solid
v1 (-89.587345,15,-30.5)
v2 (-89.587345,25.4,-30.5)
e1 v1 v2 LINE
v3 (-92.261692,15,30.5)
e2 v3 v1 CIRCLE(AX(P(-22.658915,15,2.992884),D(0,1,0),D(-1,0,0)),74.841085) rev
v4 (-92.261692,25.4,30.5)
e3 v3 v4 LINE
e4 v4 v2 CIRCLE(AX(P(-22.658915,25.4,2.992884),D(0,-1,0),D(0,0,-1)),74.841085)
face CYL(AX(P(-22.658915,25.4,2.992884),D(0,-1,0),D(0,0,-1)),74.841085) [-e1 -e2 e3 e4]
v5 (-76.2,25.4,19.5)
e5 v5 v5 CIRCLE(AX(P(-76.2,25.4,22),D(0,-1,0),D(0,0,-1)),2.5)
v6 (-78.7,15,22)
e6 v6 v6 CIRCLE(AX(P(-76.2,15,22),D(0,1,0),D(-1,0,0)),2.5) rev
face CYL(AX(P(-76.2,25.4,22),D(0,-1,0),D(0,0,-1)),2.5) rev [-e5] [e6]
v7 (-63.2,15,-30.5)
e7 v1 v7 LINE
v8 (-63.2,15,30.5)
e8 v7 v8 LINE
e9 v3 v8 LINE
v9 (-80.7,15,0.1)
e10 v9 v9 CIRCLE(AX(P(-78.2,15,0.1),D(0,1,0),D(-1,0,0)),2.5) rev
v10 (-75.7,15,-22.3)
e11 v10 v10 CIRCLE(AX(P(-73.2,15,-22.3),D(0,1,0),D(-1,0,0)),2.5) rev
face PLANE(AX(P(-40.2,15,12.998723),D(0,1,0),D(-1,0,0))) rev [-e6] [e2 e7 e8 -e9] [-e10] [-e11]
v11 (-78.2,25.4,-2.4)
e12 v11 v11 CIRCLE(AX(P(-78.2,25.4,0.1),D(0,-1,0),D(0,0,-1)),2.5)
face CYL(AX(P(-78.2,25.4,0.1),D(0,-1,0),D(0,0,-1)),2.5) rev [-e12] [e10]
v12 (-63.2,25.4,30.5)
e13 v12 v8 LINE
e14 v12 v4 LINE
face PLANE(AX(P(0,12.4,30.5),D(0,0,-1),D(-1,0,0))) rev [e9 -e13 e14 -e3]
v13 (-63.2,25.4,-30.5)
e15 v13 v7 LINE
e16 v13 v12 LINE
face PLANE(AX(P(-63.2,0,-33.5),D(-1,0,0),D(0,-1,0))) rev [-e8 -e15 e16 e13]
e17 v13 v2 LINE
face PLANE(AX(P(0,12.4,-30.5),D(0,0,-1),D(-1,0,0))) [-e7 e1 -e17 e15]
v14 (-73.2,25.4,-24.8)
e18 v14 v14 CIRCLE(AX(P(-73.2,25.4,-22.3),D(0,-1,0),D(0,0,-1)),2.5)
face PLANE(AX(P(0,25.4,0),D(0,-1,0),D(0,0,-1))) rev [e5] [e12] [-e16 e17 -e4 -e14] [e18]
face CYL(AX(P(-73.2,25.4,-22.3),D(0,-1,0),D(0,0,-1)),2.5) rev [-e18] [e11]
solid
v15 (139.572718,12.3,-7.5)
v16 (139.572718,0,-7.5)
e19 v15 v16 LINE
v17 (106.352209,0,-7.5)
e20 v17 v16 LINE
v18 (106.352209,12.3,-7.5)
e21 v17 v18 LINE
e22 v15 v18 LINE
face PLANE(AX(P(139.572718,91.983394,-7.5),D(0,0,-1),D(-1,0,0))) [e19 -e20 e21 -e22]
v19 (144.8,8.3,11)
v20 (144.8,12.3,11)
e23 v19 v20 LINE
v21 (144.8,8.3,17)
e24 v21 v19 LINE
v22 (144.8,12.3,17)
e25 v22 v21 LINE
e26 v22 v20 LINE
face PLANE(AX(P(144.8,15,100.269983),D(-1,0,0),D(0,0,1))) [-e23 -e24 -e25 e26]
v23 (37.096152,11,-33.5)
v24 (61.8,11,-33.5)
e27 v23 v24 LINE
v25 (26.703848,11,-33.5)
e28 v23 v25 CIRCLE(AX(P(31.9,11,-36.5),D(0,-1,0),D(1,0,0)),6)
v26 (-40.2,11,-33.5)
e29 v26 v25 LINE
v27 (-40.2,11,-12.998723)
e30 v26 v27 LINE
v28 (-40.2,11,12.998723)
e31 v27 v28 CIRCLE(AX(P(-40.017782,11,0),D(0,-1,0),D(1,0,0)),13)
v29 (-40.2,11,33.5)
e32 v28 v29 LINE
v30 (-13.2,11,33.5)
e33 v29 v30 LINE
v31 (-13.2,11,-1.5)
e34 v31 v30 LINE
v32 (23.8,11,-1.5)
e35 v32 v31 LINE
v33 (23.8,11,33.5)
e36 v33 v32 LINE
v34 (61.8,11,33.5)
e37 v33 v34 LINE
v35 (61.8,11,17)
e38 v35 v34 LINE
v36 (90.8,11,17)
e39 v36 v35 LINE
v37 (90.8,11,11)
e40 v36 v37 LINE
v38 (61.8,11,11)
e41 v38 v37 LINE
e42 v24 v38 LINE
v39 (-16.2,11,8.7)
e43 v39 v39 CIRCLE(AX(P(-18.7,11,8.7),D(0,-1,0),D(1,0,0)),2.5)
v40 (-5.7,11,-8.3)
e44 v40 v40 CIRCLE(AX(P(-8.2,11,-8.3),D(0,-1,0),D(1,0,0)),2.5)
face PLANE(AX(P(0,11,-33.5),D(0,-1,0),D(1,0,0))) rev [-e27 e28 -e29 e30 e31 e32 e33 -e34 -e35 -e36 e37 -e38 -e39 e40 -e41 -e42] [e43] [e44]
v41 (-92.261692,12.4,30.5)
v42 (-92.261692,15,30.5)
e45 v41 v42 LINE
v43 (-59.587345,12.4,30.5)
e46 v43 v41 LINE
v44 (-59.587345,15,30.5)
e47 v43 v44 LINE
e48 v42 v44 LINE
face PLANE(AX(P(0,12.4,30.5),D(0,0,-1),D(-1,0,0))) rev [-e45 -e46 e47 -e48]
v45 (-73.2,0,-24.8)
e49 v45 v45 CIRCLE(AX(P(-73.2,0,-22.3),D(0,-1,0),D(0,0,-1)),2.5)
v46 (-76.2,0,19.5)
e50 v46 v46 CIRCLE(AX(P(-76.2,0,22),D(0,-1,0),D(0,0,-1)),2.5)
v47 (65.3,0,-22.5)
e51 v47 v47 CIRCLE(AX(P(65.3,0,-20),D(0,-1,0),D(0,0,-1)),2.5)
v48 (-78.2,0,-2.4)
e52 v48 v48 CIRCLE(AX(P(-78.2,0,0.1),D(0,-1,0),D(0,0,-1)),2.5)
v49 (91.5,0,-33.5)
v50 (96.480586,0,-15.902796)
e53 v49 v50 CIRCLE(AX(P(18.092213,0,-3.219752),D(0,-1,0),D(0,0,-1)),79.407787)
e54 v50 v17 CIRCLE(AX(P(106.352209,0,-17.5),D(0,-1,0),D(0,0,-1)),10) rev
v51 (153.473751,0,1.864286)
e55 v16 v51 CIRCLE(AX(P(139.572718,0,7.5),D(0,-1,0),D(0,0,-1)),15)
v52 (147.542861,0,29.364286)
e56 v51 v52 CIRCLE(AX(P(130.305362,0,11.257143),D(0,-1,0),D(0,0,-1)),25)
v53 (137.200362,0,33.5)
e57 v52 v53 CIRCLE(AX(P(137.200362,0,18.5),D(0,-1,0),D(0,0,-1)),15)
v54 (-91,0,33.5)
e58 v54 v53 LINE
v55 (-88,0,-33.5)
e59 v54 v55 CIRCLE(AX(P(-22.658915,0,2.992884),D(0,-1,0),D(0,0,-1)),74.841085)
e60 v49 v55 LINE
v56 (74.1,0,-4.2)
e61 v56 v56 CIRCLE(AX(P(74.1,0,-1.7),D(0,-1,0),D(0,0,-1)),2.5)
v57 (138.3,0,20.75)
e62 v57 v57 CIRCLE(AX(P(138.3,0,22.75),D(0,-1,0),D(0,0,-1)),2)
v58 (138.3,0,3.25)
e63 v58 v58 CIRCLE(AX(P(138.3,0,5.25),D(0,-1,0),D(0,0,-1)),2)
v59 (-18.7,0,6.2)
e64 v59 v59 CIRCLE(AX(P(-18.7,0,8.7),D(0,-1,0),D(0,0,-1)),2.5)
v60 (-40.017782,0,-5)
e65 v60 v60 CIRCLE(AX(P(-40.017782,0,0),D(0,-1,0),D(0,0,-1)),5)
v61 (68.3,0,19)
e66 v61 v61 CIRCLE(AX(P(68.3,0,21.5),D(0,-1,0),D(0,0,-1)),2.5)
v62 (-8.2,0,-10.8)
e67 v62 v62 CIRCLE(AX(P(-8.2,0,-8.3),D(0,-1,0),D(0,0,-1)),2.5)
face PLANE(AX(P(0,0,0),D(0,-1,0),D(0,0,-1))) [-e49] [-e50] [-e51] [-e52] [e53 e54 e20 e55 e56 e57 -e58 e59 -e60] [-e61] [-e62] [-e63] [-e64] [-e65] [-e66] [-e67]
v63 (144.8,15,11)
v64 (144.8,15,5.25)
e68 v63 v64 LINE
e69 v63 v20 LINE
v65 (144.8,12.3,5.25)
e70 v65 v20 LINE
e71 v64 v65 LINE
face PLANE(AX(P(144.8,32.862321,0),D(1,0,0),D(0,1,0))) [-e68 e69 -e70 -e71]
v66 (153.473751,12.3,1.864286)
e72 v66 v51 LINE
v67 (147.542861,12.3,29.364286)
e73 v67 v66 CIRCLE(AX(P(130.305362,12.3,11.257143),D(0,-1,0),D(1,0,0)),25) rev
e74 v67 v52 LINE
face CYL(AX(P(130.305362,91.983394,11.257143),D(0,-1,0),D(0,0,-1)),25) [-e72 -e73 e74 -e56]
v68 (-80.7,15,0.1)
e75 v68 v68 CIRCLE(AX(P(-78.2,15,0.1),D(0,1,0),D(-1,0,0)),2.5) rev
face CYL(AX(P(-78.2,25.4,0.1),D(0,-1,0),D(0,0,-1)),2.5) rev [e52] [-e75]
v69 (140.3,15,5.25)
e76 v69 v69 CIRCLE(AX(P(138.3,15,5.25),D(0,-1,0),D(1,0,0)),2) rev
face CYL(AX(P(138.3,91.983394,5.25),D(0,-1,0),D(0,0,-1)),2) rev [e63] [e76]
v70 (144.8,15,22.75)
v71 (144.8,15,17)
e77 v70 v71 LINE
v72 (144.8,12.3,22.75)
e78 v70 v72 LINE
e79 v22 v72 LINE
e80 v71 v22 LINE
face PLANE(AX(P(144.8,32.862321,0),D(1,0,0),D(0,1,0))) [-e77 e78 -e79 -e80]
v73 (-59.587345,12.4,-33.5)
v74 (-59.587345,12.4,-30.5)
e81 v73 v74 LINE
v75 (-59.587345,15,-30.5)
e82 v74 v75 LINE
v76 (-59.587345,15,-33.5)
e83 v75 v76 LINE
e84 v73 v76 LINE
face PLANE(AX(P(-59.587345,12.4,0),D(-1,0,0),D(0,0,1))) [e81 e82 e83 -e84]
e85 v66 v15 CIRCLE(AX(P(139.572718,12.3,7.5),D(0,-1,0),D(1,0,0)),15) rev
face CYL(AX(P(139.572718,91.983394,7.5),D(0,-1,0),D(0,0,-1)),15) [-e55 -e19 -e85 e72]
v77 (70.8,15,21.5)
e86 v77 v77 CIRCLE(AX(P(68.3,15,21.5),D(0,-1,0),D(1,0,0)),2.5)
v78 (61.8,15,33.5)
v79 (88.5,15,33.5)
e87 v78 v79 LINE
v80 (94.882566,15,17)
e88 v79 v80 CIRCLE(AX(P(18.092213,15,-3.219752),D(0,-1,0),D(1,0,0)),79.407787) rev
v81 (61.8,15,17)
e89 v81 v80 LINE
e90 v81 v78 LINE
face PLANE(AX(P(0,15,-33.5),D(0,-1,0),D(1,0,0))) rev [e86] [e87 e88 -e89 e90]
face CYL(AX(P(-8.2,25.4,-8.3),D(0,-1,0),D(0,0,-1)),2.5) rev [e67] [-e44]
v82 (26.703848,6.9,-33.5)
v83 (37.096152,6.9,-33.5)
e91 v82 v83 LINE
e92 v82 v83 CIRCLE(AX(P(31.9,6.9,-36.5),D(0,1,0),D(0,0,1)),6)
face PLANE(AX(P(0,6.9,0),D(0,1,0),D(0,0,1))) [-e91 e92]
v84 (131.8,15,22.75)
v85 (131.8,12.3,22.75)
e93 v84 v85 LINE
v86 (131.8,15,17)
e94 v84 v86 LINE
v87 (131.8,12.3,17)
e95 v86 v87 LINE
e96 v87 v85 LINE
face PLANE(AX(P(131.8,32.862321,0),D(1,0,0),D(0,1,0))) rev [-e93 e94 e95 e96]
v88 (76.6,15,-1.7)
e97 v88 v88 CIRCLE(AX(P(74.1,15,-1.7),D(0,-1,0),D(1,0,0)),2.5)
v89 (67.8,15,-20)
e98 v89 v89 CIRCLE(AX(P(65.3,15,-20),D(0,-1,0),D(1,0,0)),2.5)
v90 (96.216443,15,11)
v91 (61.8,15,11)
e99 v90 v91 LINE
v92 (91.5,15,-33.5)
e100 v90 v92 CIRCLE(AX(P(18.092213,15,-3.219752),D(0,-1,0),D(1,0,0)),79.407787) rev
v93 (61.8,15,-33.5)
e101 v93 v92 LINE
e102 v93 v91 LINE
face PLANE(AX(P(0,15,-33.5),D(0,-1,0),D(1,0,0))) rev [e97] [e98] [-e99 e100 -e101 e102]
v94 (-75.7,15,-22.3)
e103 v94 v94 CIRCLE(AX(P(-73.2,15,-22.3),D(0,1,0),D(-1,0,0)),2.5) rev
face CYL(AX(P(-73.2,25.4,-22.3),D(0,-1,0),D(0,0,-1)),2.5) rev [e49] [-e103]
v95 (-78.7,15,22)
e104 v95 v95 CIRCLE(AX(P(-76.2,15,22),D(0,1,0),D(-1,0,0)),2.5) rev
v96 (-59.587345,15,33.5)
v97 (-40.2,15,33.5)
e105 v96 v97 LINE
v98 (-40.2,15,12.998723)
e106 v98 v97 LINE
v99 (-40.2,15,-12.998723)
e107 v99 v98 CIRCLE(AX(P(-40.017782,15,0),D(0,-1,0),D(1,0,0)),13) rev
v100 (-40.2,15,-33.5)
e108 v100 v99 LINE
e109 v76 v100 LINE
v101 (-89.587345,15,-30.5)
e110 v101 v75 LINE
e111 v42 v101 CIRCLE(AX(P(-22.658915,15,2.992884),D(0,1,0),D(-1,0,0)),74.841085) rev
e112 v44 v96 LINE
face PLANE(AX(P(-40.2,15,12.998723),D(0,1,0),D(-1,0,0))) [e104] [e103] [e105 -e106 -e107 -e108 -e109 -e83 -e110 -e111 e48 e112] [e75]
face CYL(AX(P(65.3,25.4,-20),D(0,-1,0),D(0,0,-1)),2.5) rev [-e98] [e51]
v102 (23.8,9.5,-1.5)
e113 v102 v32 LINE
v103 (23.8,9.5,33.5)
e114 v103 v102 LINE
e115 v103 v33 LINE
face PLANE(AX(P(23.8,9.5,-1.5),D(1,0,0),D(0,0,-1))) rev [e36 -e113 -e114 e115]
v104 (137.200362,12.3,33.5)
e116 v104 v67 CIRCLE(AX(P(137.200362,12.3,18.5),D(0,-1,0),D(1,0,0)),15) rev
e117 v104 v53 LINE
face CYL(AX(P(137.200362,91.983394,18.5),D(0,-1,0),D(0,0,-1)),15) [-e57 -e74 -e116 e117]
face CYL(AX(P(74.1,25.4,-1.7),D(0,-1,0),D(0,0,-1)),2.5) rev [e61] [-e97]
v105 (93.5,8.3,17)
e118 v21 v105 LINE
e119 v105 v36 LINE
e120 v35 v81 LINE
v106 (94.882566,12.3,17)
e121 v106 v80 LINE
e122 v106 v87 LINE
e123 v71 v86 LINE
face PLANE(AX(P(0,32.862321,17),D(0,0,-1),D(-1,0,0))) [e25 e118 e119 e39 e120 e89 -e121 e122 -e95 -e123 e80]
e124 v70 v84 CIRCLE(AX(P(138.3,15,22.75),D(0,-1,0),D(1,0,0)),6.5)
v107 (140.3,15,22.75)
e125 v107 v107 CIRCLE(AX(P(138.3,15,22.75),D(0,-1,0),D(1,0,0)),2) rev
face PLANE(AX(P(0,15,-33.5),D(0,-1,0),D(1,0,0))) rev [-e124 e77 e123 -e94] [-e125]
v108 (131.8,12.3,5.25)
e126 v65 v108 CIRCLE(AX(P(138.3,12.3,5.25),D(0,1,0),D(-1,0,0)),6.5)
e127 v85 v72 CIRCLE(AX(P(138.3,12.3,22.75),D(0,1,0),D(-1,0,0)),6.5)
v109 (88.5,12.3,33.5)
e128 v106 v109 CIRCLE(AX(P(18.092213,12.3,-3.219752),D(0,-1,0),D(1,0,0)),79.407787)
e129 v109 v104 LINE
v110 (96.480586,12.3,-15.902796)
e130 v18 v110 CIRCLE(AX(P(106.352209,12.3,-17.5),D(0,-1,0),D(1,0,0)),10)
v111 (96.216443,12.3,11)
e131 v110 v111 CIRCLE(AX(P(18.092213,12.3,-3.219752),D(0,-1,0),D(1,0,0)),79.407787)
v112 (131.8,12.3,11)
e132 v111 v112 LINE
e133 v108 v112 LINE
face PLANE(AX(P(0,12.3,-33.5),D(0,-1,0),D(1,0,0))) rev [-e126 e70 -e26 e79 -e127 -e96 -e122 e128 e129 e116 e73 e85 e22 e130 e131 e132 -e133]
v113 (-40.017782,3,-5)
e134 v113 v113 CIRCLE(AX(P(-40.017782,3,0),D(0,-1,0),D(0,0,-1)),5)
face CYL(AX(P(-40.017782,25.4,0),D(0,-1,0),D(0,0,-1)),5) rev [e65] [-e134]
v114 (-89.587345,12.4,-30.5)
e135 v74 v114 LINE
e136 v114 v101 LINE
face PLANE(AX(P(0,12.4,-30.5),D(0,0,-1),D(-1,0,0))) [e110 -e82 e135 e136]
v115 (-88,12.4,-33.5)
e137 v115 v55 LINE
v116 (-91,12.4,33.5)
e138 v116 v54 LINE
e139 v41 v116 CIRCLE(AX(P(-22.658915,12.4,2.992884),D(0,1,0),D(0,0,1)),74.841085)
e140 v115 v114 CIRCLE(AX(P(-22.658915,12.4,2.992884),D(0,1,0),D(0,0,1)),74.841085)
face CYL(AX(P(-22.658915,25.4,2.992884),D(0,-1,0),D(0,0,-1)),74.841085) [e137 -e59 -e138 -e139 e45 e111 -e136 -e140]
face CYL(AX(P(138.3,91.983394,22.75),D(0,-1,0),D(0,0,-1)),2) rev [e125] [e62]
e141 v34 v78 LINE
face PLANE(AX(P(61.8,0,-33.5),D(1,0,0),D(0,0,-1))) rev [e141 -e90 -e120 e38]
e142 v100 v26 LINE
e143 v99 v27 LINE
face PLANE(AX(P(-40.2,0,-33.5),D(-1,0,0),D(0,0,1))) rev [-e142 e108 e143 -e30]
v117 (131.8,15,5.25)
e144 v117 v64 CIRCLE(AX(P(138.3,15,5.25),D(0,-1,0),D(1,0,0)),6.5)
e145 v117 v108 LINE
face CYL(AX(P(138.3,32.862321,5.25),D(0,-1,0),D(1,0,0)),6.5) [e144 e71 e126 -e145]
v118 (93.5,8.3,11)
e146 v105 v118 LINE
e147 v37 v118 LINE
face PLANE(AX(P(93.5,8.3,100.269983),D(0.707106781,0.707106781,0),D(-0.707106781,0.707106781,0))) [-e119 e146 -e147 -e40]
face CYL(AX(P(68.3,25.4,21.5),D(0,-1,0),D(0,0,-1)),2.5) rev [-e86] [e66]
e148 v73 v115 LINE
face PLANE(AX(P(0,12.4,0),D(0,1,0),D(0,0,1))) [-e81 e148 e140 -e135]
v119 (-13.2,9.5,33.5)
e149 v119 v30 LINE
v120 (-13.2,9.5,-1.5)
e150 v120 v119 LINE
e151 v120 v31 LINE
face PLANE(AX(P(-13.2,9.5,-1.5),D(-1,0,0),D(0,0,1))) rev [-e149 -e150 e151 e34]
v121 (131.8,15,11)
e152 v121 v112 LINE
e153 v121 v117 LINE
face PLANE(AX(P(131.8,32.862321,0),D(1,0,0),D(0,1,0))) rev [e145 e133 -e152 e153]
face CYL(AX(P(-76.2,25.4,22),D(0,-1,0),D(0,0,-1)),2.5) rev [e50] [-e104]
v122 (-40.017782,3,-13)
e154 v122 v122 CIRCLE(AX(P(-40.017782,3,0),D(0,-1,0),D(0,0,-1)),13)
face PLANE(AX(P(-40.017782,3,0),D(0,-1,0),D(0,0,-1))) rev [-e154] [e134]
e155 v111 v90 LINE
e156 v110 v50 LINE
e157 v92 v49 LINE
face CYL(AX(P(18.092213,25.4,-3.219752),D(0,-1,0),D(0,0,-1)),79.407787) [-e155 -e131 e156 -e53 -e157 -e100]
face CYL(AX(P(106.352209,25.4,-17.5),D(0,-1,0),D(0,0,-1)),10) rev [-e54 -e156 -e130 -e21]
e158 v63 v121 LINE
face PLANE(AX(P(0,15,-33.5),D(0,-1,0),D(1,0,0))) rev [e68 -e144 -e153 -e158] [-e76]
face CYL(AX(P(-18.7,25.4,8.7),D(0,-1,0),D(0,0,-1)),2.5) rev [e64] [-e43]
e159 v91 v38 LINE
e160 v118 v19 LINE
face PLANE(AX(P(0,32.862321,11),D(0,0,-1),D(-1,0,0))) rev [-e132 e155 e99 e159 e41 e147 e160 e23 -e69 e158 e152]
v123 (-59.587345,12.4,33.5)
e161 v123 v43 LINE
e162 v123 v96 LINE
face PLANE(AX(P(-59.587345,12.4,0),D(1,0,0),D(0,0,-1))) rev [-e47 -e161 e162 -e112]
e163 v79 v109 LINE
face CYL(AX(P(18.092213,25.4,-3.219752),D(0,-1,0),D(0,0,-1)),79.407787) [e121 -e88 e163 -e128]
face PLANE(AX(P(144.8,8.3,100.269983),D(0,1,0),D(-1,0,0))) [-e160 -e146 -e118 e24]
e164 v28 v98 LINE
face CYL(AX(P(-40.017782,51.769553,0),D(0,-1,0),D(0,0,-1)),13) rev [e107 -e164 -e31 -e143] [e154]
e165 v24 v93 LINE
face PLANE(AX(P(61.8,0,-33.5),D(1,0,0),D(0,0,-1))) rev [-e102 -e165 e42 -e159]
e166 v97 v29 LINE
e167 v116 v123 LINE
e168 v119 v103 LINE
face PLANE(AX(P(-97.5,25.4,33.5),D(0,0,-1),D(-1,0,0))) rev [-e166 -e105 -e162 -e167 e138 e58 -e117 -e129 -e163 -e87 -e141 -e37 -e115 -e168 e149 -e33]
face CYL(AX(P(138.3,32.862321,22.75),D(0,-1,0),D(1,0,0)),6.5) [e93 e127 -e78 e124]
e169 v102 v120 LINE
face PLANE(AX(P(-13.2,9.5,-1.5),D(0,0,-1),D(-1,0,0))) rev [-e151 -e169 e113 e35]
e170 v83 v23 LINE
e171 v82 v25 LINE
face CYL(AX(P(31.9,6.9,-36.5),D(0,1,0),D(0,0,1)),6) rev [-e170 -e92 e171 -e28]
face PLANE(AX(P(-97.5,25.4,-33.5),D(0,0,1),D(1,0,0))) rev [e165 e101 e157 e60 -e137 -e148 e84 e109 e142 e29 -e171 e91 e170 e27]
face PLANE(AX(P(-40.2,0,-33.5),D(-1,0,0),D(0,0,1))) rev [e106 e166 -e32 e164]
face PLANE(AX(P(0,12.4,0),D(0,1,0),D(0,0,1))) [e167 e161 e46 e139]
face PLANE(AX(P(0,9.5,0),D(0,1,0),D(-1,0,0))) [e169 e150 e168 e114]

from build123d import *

# Parameters (mm, degrees)
SKETCH1_W           = 195
SKETCH1_H           = 67
BOSS_EXTRUDE1_DEPTH = 25.4
CUT_EXTRUDE1_DEPTH  = 107.177492907
CUT_EXTRUDE2_DEPTH  = 121.997561959
CUT_EXTRUDE3_START  = -13
SKETCH4_W           = 3.612655346
SKETCH4_H           = 3
CUT_EXTRUDE3_DEPTH  = 13
SKETCH6_R           = 2.5
CUT_EXTRUDE4_DEPTH  = 107.177492907
SKETCH7_W           = 37
SKETCH7_H           = 35
CUT_EXTRUDE5_DEPTH  = 1.5
CUT_EXTRUDE6_DEPTH  = 18.5
SKETCH9_R           = 2
BOSS_EXTRUDE2_DEPTH = 12.3
FILLET1_R           = 10
CUT_EXTRUDE7_REACH  = 165.895
CUT_EXTRUDE7_START  = -3
SKETCH10_R          = 13
SKETCH13_R          = 5
CUT_EXTRUDE9_DEPTH  = 161.89488962
SKETCH11_R          = 2
BOSS_EXTRUDE3_DEPTH = 2.7
CUT_EXTRUDE8_DEPTH  = 6


# Read off the part's stored shape, not the designer's step: Split1
with BuildPart() as part:
    # Sketch1 → Boss-Extrude1 (new body)
    with BuildSketch(Plane(origin=(0, 0, 0), x_dir=(1, 0, 0), z_dir=(0, 1, 0))):
        Rectangle(SKETCH1_W, SKETCH1_H)
    extrude(amount=BOSS_EXTRUDE1_DEPTH)

    # Sketch2 → Cut-Extrude1 (cut, through all)
    with BuildSketch(Plane.XZ):
        with BuildLine():
            Line((97.5, -3.219751644), (97.5, 33.5))
            Line((97.5, 33.5), (88.5, 33.5))
            ThreePointArc((88.5, 33.5), (95.217186872, 15.683556008), (97.5, -3.219751644))
        make_face()
        with BuildLine():
            Line((97.5, -33.5), (97.5, -3.219751644))
            ThreePointArc((97.5, -3.219751644), (95.985558513, -18.65423771), (91.5, -33.5))
            Line((91.5, -33.5), (97.5, -33.5))
        make_face()
        with BuildLine():
            ThreePointArc((-88, -33.5), (-95.08607052, -15.861694529), (-97.5, 2.992884749))
            Line((-97.5, 2.992884749), (-97.5, -33.5))
            Line((-97.5, -33.5), (-88, -33.5))
        make_face()
        with BuildLine():
            ThreePointArc((-97.5, 2.992884749), (-95.856964648, 18.588830376), (-91, 33.5))
            Line((-91, 33.5), (-97.5, 33.5))
            Line((-97.5, 33.5), (-97.5, 2.992884749))
        make_face()
    extrude(amount=-CUT_EXTRUDE1_DEPTH, mode=Mode.SUBTRACT)

    # Sketch3 → Cut-Extrude2 (cut, through all)
    with BuildSketch(Plane(origin=(0, 0, 33.5), x_dir=(-1, 0, 0), z_dir=(0, 0, -1))):
        Polygon((63.2, 25.4), (63.2, 15), (40.2, 15), (40.2, 11), (-61.8, 11), (-61.8, 15), (-97.5, 15), (-97.5, 25.4), align=None)
    extrude(amount=CUT_EXTRUDE2_DEPTH, mode=Mode.SUBTRACT)

    # Sketch4 → Cut-Extrude3 (cut)
    with BuildSketch(Plane(origin=(0, 25.4, 0), x_dir=(1, 0, 0), z_dir=(0, 1, 0)).offset(CUT_EXTRUDE3_START)):
        with BuildLine():
            Line((-63.2, 30.5), (-63.2, 33.5))
            Line((-63.2, 33.5), (-88, 33.5))
            ThreePointArc((-88, 33.5), (-88.810680862, 32.008999469), (-89.587344654, 30.5))
            Line((-89.587344654, 30.5), (-63.2, 30.5))
        make_face()
        with Locations((-61.393672327, 32)):
            Rectangle(SKETCH4_W, SKETCH4_H)
        with BuildLine():
            Line((-63.2, -33.5), (-63.2, -30.5))
            Line((-63.2, -30.5), (-92.261692194, -30.5))
            ThreePointArc((-92.261692194, -30.5), (-91.647155152, -32.006859002), (-91, -33.5))
            Line((-91, -33.5), (-63.2, -33.5))
        make_face()
        with Locations((-61.393672327, -32)):
            Rectangle(SKETCH4_W, SKETCH4_H)
    extrude(amount=CUT_EXTRUDE3_DEPTH, mode=Mode.SUBTRACT)

    # Sketch6 → Cut-Extrude4 (cut, through all)
    with BuildSketch(Plane.XZ):
        with Locations(Location((-18.7, 8.7, 0), (0, 0, 270))):
            Circle(SKETCH6_R)
        with Locations(Location((74.1, -1.7, 0), (0, 0, 270))):
            Circle(SKETCH6_R)
        with Locations(Location((68.3, 21.5, 0), (0, 0, 270))):
            Circle(SKETCH6_R)
        with Locations(Location((65.3, -20, 0), (0, 0, 270))):
            Circle(SKETCH6_R)
        with Locations(Location((-8.2, -8.3, 0), (0, 0, 270))):
            Circle(SKETCH6_R)
        with Locations(Location((-76.2, 22, 0), (0, 0, 270))):
            Circle(SKETCH6_R)
        with Locations(Location((-78.2, 0.1, 0), (0, 0, 270))):
            Circle(SKETCH6_R)
        with Locations(Location((-73.2, -22.3, 0), (0, 0, 270))):
            Circle(SKETCH6_R)
    extrude(amount=-CUT_EXTRUDE4_DEPTH, mode=Mode.SUBTRACT)

    # Sketch7 → Cut-Extrude5 (cut)
    with BuildSketch(Plane(origin=(0, 11, 0), x_dir=(1, 0, 0), z_dir=(0, 1, 0))):
        with Locations((5.3, -16)):
            Rectangle(SKETCH7_W, SKETCH7_H)
    extrude(amount=-CUT_EXTRUDE5_DEPTH, mode=Mode.SUBTRACT)

    # Sketch8 → Cut-Extrude6 (cut)
    with BuildSketch(Plane(origin=(0, 25.4, 0), x_dir=(1, 0, 0), z_dir=(0, 1, 0))):
        with BuildLine():
            Line((37.096152423, 33.5), (31.9, 33.5))
            Line((31.9, 33.5), (31.9, 30.5))
            ThreePointArc((31.9, 30.5), (34.9, 31.303847577), (37.096152423, 33.5))
        make_face()
        with BuildLine():
            Line((31.9, 33.5), (26.703847577, 33.5))
            ThreePointArc((26.703847577, 33.5), (28.9, 31.303847577), (31.9, 30.5))
            Line((31.9, 30.5), (31.9, 33.5))
        make_face()
    extrude(amount=-CUT_EXTRUDE6_DEPTH, mode=Mode.SUBTRACT)

    # Sketch9 → Boss-Extrude2 (add)
    with BuildSketch(Plane.XZ):
        with BuildLine():
            Line((88.5, 33.5), (137.200361796, 33.5))
            ThreePointArc((137.200361796, 33.5), (142.769729546, 32.427747228), (147.542861296, 29.364285714))
            ThreePointArc((147.542861296, 29.364285714), (154.743476693, 16.527679502), (153.473750823, 1.864285714))
            ThreePointArc((153.473750823, 1.864285714), (147.953179578, -4.940573023), (139.572717606, -7.5))
            Line((139.572717606, -7.5), (97.384558849, -7.5))
            ThreePointArc((97.384558849, -7.5), (95.698800641, 13.597328658), (88.5, 33.5))
        make_face()
        with Locations(Location((138.3, 5.25, 0), (0, 0, 270))):
            Circle(SKETCH9_R, mode=Mode.SUBTRACT)
        with Locations(Location((138.3, 22.75, 0), (0, 0, 270))):
            Circle(SKETCH9_R, mode=Mode.SUBTRACT)
    extrude(amount=-BOSS_EXTRUDE2_DEPTH)

    # Fillet1
    fillet1_edges = [part.edges().sort_by_distance(p)[0] for p in [
        (97.384558849, 6.15, -7.5),
    ]]
    fillet(fillet1_edges, radius=FILLET1_R)

    # Cut-Extrude7: up to this face of the body (flat: up to its plane)
    cut_extrude7_end = Plane(part.part.faces().sort_by_distance((-51.561702064, 15, 0))[0])
    # Sketch10 → Cut-Extrude7 (cut, up to the picked face)
    with BuildSketch(Plane.XZ.offset(CUT_EXTRUDE7_START), mode=Mode.PRIVATE) as cut_extrude7_sk1:
        with Locations(Location((-40.017782272, 0, 0), (0, 0, 270))):
            Circle(SKETCH10_R)
    cut_extrude7_tool1 = split(extrude(cut_extrude7_sk1.sketch, amount=-CUT_EXTRUDE7_REACH, mode=Mode.PRIVATE), bisect_by=cut_extrude7_end, keep=Keep.BOTH, mode=Mode.PRIVATE)
    add(cut_extrude7_tool1.solids().sort_by(Axis((-40.017782, 3, 0), (0, 1, 0)))[0], mode=Mode.SUBTRACT)

    # Sketch13 → Cut-Extrude9 (cut, through all)
    with BuildSketch(Plane.XZ):
        with Locations(Location((-40.017782272, 0, 0), (0, 0, 270))):
            Circle(SKETCH13_R)
    extrude(amount=-CUT_EXTRUDE9_DEPTH, mode=Mode.SUBTRACT)

    # Sketch11 → Boss-Extrude3 (add)
    # profile 1 of 2: a face of its own
    with BuildSketch(Plane(origin=(0, 12.3, 0), x_dir=(1, 0, 0), z_dir=(0, 1, 0))):
        with BuildLine():
            Line((144.8, -11), (144.8, -5.25))
            ThreePointArc((144.8, -5.25), (138.3, 1.25), (131.8, -5.25))
            Line((131.8, -5.25), (131.8, -11))
            Line((131.8, -11), (144.8, -11))
        make_face()
        with Locations(Location((138.3, -5.25, 0), (0, 0, 90))):
            Circle(SKETCH11_R, mode=Mode.SUBTRACT)
    # profile 2 of 2: a face of its own
    with BuildSketch(Plane(origin=(0, 12.3, 0), x_dir=(1, 0, 0), z_dir=(0, 1, 0))):
        with BuildLine():
            Line((144.8, -22.75), (144.8, -17))
            Line((144.8, -17), (131.8, -17))
            Line((131.8, -17), (131.8, -22.75))
            ThreePointArc((131.8, -22.75), (138.3, -29.25), (144.8, -22.75))
        make_face()
        with Locations(Location((138.3, -22.75, 0), (0, 0, 90))):
            Circle(SKETCH11_R, mode=Mode.SUBTRACT)
    extrude(amount=BOSS_EXTRUDE3_DEPTH)


with BuildPart() as body_2:
    # Split1: the piece on the far side of the plane
    add(part.part)
    split(bisect_by=Plane(origin=(0, 15, 0), x_dir=(1, 0, 0), z_dir=(0, 1, 0)), keep=Keep.BOTTOM)

    # Sketch12 → Cut-Extrude8 (cut)
    with BuildSketch(Plane.XY.offset(11)):
        Polygon((144.8, 15), (144.8, 8.3), (93.5, 8.3), (90.8, 11), (61.8, 11), (61.8, 15), align=None)
    extrude(amount=CUT_EXTRUDE8_DEPTH, mode=Mode.SUBTRACT)


with BuildPart() as part_1:
    add(part.part)

    # Split1
    split(bisect_by=Plane(origin=(0, 15, 0), x_dir=(1, 0, 0), z_dir=(0, 1, 0)), keep=Keep.TOP)


solid = Compound([body_2.part, part_1.part])
